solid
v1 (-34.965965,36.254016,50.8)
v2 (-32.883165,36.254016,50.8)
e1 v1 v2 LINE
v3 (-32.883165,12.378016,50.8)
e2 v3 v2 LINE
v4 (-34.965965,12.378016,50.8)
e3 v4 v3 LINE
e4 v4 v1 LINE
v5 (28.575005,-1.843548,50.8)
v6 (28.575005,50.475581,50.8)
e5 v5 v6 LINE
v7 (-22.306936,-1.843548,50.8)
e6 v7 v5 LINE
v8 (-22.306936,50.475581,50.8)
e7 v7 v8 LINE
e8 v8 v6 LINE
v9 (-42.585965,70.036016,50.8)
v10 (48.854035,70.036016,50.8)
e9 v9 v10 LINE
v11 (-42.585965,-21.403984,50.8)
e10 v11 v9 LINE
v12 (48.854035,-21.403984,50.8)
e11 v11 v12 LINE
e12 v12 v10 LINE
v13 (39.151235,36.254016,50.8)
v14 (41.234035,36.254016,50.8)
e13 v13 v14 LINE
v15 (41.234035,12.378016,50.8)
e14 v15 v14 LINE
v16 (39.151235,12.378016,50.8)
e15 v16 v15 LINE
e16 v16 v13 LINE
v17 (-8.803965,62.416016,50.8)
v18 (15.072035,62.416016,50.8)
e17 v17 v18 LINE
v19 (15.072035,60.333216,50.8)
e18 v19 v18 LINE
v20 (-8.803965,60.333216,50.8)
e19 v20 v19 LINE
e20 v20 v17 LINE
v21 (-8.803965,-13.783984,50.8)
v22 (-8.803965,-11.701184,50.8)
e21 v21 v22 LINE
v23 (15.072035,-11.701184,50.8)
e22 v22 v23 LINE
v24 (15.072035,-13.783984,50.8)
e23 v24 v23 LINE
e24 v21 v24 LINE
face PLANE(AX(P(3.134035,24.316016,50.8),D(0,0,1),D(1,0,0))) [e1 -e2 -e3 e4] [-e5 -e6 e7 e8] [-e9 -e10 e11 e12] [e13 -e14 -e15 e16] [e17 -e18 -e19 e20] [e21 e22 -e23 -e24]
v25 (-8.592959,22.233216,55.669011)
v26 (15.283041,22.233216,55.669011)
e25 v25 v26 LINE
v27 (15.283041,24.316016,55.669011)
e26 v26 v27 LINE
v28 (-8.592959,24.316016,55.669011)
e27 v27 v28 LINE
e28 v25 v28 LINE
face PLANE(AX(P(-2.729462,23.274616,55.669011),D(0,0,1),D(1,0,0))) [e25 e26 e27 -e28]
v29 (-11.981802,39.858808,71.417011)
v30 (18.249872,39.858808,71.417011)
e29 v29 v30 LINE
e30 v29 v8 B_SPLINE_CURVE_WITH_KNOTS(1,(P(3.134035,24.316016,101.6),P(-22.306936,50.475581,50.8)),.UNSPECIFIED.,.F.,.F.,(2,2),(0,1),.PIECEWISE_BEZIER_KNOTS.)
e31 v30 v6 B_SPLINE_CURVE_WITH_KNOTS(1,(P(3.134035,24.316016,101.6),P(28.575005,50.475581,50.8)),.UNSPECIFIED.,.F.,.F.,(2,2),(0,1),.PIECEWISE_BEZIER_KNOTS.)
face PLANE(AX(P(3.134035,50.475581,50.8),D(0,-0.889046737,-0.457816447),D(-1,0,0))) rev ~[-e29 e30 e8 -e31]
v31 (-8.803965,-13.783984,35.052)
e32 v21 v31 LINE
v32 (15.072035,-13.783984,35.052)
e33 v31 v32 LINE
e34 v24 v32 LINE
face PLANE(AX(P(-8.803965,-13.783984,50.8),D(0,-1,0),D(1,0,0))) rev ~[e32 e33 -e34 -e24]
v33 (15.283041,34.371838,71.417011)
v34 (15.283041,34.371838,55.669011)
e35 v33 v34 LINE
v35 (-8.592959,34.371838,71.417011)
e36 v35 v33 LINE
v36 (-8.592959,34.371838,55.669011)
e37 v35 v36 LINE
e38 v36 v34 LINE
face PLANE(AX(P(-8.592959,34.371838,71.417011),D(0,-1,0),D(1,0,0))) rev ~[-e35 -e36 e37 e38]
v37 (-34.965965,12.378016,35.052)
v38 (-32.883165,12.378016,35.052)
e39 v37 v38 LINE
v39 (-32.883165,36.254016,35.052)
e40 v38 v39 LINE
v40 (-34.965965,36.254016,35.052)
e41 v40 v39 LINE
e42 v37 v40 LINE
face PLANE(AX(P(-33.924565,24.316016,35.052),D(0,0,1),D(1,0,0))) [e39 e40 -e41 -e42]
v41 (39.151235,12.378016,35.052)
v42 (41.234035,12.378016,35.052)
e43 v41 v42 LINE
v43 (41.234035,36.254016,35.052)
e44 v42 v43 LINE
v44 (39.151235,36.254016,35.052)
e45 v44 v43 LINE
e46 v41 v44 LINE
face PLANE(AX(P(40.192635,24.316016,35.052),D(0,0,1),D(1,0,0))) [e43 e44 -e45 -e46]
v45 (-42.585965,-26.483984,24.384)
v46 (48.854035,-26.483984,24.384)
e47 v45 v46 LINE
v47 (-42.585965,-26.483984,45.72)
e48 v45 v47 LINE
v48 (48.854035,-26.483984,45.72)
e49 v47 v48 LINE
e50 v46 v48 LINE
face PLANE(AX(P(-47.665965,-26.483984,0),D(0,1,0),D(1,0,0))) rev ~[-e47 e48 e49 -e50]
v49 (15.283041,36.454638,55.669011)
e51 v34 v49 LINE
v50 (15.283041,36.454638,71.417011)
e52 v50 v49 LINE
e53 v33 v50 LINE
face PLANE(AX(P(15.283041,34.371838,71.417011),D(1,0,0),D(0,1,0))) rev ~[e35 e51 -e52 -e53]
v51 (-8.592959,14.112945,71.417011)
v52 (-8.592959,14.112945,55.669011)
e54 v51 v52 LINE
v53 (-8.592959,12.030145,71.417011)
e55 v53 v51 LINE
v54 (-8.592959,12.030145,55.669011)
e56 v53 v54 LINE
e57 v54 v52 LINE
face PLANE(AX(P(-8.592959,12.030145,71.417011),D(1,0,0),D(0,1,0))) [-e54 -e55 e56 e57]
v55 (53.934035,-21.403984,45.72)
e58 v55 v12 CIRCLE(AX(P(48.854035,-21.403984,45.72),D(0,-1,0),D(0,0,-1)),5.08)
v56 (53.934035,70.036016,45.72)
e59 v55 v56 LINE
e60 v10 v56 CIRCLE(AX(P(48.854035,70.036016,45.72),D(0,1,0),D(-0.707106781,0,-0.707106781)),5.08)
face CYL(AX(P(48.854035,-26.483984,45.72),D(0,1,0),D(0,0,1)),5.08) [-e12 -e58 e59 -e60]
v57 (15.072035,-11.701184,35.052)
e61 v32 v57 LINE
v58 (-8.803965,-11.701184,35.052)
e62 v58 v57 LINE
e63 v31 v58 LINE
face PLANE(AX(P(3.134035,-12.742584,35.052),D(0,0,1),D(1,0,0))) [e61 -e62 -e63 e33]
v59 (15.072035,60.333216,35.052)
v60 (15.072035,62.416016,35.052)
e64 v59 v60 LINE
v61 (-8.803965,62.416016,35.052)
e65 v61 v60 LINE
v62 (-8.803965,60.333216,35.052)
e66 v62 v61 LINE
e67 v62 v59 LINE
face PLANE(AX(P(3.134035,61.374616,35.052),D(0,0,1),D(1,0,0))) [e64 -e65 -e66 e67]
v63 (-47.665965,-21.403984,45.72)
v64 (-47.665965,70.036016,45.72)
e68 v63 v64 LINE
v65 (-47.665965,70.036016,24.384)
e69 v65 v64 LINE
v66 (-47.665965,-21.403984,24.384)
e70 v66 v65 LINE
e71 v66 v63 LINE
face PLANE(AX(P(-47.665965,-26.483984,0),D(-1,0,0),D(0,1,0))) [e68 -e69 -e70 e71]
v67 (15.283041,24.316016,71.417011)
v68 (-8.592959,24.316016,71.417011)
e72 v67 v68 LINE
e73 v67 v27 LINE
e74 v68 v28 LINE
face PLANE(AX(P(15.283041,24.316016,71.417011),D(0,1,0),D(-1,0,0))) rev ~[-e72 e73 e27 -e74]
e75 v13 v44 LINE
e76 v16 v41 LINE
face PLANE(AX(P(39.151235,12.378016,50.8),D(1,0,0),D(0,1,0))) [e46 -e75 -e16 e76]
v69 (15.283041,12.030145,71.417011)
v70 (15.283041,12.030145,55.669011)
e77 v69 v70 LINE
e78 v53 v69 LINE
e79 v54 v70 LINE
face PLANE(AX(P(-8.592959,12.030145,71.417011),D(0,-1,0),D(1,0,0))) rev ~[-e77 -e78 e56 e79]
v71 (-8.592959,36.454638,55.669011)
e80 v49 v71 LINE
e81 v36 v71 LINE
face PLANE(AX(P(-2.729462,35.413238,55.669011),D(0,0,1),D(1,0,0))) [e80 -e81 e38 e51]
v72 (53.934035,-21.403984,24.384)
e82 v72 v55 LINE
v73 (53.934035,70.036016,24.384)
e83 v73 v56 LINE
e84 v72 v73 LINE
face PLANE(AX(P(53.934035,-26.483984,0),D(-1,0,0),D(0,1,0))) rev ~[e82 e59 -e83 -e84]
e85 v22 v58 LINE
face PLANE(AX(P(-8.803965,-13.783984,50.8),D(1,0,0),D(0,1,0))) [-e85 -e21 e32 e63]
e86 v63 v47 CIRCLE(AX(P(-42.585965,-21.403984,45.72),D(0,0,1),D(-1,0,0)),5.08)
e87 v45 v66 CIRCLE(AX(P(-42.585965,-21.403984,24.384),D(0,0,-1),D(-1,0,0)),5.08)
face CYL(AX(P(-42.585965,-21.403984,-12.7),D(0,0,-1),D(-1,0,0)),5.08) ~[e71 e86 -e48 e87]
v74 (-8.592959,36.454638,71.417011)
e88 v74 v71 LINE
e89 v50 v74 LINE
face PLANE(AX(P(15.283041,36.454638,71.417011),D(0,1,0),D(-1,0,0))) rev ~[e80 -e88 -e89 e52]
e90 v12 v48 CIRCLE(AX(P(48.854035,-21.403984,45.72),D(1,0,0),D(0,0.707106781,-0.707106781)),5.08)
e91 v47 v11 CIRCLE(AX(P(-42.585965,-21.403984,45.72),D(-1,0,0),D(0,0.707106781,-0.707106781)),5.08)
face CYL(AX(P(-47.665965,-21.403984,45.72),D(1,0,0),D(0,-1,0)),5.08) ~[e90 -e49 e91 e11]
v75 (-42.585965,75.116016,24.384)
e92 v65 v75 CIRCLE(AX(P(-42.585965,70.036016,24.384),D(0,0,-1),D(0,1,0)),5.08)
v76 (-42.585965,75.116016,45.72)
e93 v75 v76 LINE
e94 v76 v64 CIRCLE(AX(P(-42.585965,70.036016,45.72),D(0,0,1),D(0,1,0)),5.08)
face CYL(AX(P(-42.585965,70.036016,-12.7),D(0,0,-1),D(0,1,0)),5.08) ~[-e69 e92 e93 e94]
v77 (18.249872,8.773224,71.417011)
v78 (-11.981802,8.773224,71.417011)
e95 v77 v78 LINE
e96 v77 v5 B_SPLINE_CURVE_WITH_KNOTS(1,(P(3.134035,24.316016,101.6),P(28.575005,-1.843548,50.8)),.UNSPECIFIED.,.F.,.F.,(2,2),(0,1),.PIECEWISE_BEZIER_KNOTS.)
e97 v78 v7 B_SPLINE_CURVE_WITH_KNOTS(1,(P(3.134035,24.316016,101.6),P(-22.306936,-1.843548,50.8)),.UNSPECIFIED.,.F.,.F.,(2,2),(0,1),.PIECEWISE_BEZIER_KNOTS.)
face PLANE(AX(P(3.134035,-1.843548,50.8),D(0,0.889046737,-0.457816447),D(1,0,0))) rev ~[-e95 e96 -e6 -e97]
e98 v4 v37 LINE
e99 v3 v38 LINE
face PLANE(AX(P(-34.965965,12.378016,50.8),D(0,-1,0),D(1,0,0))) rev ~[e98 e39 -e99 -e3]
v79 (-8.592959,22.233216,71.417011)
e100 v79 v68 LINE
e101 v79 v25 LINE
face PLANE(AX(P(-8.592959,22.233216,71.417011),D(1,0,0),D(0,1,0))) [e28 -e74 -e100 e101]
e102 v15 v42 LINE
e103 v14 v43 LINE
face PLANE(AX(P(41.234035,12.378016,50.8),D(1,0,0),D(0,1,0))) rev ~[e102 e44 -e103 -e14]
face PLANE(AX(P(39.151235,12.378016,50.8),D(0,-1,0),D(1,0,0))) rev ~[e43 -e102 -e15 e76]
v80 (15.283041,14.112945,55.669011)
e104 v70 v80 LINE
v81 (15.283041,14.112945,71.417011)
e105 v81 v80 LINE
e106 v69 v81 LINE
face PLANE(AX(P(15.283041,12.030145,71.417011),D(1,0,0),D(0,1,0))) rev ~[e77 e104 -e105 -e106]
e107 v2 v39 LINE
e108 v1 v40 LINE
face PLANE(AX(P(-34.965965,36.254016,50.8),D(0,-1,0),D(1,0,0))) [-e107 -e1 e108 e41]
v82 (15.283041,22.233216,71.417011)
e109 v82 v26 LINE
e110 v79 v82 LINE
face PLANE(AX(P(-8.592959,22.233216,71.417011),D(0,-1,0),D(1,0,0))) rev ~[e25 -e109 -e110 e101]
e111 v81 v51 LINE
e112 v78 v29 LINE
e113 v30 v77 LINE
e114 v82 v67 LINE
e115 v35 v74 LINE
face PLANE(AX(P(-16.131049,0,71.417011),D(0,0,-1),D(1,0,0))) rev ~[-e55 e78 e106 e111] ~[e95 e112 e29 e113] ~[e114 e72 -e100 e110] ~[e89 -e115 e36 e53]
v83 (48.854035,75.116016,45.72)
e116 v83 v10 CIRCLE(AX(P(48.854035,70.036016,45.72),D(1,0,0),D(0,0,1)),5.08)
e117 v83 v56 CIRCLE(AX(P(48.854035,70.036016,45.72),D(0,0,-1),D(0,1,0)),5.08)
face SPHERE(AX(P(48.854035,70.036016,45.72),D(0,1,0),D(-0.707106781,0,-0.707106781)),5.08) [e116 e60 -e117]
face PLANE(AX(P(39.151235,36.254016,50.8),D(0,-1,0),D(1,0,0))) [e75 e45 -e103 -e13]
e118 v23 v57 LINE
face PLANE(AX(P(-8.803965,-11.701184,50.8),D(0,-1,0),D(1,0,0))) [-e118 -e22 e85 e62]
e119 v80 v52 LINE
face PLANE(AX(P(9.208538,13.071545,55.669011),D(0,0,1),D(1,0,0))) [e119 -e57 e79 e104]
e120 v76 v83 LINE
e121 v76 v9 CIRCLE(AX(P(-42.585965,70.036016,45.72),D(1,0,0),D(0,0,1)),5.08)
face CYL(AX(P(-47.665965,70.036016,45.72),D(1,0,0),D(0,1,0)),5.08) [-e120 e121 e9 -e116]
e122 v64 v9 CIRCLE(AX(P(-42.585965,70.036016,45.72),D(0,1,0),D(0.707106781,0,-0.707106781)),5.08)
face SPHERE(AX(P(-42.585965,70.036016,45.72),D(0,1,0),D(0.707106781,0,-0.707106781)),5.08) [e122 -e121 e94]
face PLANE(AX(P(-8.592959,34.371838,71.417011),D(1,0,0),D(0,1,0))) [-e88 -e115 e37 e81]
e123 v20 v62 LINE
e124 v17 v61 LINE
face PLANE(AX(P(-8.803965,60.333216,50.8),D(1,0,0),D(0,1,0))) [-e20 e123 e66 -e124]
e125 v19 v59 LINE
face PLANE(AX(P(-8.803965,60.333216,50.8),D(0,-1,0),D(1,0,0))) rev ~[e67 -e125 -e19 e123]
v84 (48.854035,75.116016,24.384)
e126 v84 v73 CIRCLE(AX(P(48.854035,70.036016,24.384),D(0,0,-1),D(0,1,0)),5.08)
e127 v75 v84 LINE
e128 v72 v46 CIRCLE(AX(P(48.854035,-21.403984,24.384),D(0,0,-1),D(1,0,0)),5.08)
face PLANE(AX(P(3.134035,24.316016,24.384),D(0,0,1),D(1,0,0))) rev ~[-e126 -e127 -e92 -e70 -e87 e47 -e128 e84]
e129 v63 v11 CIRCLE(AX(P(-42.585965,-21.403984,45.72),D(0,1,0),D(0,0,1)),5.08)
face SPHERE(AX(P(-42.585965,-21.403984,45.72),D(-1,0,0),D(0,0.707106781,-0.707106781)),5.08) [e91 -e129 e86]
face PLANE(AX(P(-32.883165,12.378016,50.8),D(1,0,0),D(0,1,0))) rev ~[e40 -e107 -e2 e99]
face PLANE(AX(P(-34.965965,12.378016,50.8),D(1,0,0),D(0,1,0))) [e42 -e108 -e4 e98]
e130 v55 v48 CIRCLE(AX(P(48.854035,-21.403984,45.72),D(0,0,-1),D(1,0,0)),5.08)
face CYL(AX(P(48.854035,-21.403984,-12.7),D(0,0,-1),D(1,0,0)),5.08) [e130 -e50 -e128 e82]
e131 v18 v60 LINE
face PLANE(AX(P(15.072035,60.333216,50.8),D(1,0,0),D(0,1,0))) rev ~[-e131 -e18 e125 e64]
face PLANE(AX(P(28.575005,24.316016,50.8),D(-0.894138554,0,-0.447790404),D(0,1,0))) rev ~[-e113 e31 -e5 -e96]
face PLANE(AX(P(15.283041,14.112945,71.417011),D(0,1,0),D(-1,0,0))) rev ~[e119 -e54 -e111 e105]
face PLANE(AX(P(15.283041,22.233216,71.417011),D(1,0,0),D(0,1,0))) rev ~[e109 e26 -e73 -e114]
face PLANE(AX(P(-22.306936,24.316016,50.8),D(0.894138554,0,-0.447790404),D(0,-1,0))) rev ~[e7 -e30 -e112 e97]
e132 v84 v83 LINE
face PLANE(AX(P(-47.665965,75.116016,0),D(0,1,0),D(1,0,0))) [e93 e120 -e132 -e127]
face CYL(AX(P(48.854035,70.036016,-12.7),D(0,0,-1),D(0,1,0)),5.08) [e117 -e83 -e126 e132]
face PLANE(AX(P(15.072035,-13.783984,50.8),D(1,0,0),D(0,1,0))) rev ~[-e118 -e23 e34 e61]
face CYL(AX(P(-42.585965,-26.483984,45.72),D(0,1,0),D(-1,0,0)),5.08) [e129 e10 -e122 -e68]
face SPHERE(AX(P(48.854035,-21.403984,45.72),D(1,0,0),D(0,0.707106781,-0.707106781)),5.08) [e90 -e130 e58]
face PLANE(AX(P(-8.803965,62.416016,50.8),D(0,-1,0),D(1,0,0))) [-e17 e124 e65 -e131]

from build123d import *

# Parameters (mm, degrees)
F0_W         = 101.6
F0_H         = 101.6
F1_DEPTH     = 50.8
F2_W         = 50.8819408715
F2_H         = 52.3191291059
F6_R         = 5.08
F7_T1_DEPTH  = 58.42
F7_S5_W      = 5.08
F7_S5_H      = 5.08
F7_T6_DEPTH  = 5.08
F7_S11_W     = 5.08
F7_S11_H     = 5.08
F7_T12_DEPTH = 5.08
F7_S17_W     = 5.08
F7_S17_H     = 5.08
F7_T18_DEPTH = 5.08
F7_S23_W     = 5.08
F7_S23_H     = 5.08
F7_T24_DEPTH = 5.08
F8_W         = 36.9938705117
F8_H         = 32.6922610402
F9_DEPTH     = 43.434
F10_W        = 2.0828
F10_H        = 23.876
F10_W_2      = 23.876
F10_H_2      = 2.0828
F11_DEPTH    = 15.748
F12_W        = 11.7269940674
F12_H        = 2.0828
F12_W_2      = 12.1490059326
F13_DEPTH    = 15.748
F14_DEPTH    = 24.384


# Not quite as in the source:
# - a fillet or chamfer that OpenCascade refuses, or shapes differently, is made with other operations: its cross-section is extruded or revolved along the edge and cut away or added


with BuildPart() as f1:
    # F0 (on Top) → F1 (new body)
    with BuildSketch(Plane.XY):
        with Locations((3.134034574, 24.3160160567)):
            Rectangle(F0_W, F0_H)
    extrude(amount=F1_DEPTH)

    # F2 (on face) → F5 section 0
    with BuildSketch(Plane.XY.offset(50.8), mode=Mode.PRIVATE) as f5_s0:
        with Locations((3.134034574, 24.3160160567)):
            Rectangle(F2_W, F2_H)
    loft([Vertex(3.134034574, 24.3160160567, 101.6), f5_s0.sketch])

    # F6
    f6_edges = [f1.edges().sort_by_distance(p)[0] for p in [
        (3.134035, -26.483984, 50.8),
        (-47.665965, 24.316016, 50.8),
        (3.134035, 75.116016, 50.8),
        (53.934035, 24.316016, 50.8),
    ]]
    fillet(f6_edges, radius=F6_R)

    # F7: fillet of radius 5.08 on 4 edges, made by hand

    # F7_s2 → F7_t1 (cut)
    with BuildSketch(Plane.XY.offset(-12.7)):
        with BuildLine():
            ThreePointArc((-42.585965426, 75.1160160567), (-46.1780678744, 73.6281185051), (-47.665965426, 70.0360160567))
            Line((-47.665965426, 70.0360160567), (-47.665965426, 75.1160160567))
            Line((-47.665965426, 75.1160160567), (-42.585965426, 75.1160160567))
        make_face()
        with BuildLine():
            ThreePointArc((-47.665965426, -21.4039839433), (-46.1780678744, -24.9960863917), (-42.585965426, -26.4839839433))
            Line((-42.585965426, -26.4839839433), (-47.665965426, -26.4839839433))
            Line((-47.665965426, -26.4839839433), (-47.665965426, -21.4039839433))
        make_face()
        with BuildLine():
            ThreePointArc((53.934034574, -21.4039839433), (52.4461370225, -24.9960863917), (48.854034574, -26.4839839433))
            Line((48.854034574, -26.4839839433), (53.934034574, -26.4839839433))
            Line((53.934034574, -26.4839839433), (53.934034574, -21.4039839433))
        make_face()
        with BuildLine():
            ThreePointArc((48.854034574, 75.1160160567), (52.4461370225, 73.6281185051), (53.934034574, 70.0360160567))
            Line((53.934034574, 70.0360160567), (53.934034574, 75.1160160567))
            Line((53.934034574, 75.1160160567), (48.854034574, 75.1160160567))
        make_face()
    extrude(amount=F7_T1_DEPTH, mode=Mode.SUBTRACT)


with BuildPart() as f7_tool4:
    # F7_s5 → F7_t6 (new body)
    with BuildSketch(Plane.XZ.offset(-70.0360160567)):
        with Locations((51.394034574, 48.26)):
            Rectangle(F7_S5_W, F7_S5_H)
    extrude(amount=-F7_T6_DEPTH)

    # F7_s7 → F7_t8 (revolve, cut)
    with BuildSketch(Plane(origin=(48.854034574, 70.0360160567, 45.72), x_dir=(-0.7071067812, 0, -0.7071067812), z_dir=(0.7071067812, 0, -0.7071067812))):
        with BuildLine():
            ThreePointArc((0, -5.08), (5.08, 0), (0, 5.08))
            Line((0, 5.08), (0, -5.08))
        make_face()
    revolve(axis=Axis((48.854034574, 70.0360160567, 45.72), (0, 1, 0)), mode=Mode.SUBTRACT)


with BuildPart() as f1_1:
    add(f1.part)

    # F7_t3: cut F7_tool4
    add(f7_tool4.part, mode=Mode.SUBTRACT)


with BuildPart() as f7_tool10:
    # F7_s11 → F7_t12 (new body)
    with BuildSketch(Plane.YZ.offset(48.854034574)):
        with Locations((-23.9439839433, 48.26)):
            Rectangle(F7_S11_W, F7_S11_H)
    extrude(amount=F7_T12_DEPTH)

    # F7_s13 → F7_t14 (revolve, cut)
    with BuildSketch(Plane(origin=(48.854034574, -21.4039839433, 45.72), x_dir=(0, 0.7071067812, -0.7071067812), z_dir=(0, -0.7071067812, -0.7071067812))):
        with BuildLine():
            ThreePointArc((0, -5.08), (5.08, 0), (0, 5.08))
            Line((0, 5.08), (0, -5.08))
        make_face()
    revolve(axis=Axis((48.854034574, -21.4039839433, 45.72), (1, 0, 0)), mode=Mode.SUBTRACT)


with BuildPart() as f1_2:
    add(f1_1.part)

    # F7_t9: cut F7_tool10
    add(f7_tool10.part, mode=Mode.SUBTRACT)


with BuildPart() as f7_tool16:
    # F7_s17 → F7_t18 (new body)
    with BuildSketch(Plane.YZ.offset(-42.585965426)):
        with Locations((-23.9439839433, 48.26)):
            Rectangle(F7_S17_W, F7_S17_H)
    extrude(amount=-F7_T18_DEPTH)

    # F7_s19 → F7_t20 (revolve, cut)
    with BuildSketch(Plane(origin=(-42.585965426, -21.4039839433, 45.72), x_dir=(0, 0.7071067812, -0.7071067812), z_dir=(0, 0.7071067812, 0.7071067812))):
        with BuildLine():
            ThreePointArc((0, -5.08), (5.08, 0), (0, 5.08))
            Line((0, 5.08), (0, -5.08))
        make_face()
    revolve(axis=Axis((-42.585965426, -21.4039839433, 45.72), (-1, 0, 0)), mode=Mode.SUBTRACT)


with BuildPart() as f1_3:
    add(f1_2.part)

    # F7_t15: cut F7_tool16
    add(f7_tool16.part, mode=Mode.SUBTRACT)


with BuildPart() as f7_tool22:
    # F7_s23 → F7_t24 (new body)
    with BuildSketch(Plane.XZ.offset(-70.0360160567)):
        with Locations((-45.125965426, 48.26)):
            Rectangle(F7_S23_W, F7_S23_H)
    extrude(amount=-F7_T24_DEPTH)

    # F7_s25 → F7_t26 (revolve, cut)
    with BuildSketch(Plane(origin=(-42.585965426, 70.0360160567, 45.72), x_dir=(0.7071067812, 0, -0.7071067812), z_dir=(0.7071067812, 0, 0.7071067812))):
        with BuildLine():
            ThreePointArc((0, -5.08), (5.08, 0), (0, 5.08))
            Line((0, 5.08), (0, -5.08))
        make_face()
    revolve(axis=Axis((-42.585965426, 70.0360160567, 45.72), (0, 1, 0)), mode=Mode.SUBTRACT)


with BuildPart() as f1_4:
    add(f1_3.part)

    # F7_t21: cut F7_tool22
    add(f7_tool22.part, mode=Mode.SUBTRACT)

    # F8 (on Front) → F9 (cut)
    with BuildSketch(Plane.XZ):
        with Locations((2.3658862337, 87.7631418407)):
            Rectangle(F8_W, F8_H)
    extrude(amount=-F9_DEPTH, mode=Mode.SUBTRACT)

    # F10 (on face) → F11 (cut)
    with BuildSketch(Plane.XY.offset(50.8)):
        with Locations((-33.924565426, 24.3160160567)):
            Rectangle(F10_W, F10_H)
        with Locations((3.134034574, 61.3746160567)):
            Rectangle(F10_W_2, F10_H_2)
        with Locations((40.192634574, 24.3160160567)):
            Rectangle(F10_W, F10_H)
        with Locations((3.134034574, -12.7425839433)):
            Rectangle(F10_W_2, F10_H_2)
    extrude(amount=-F11_DEPTH, mode=Mode.SUBTRACT)

    # F12 (on face) → F13 (cut)
    with BuildSketch(Plane.XY.offset(71.4170113206)):
        with Locations((-2.7294624597, 35.4132379736)):
            Rectangle(F12_W, F12_H)
        with Locations((9.2085375403, 35.4132379736)):
            Rectangle(F12_W_2, F12_H)
        with Locations((9.2085375403, 13.0715451534)):
            Rectangle(F12_W_2, F12_H)
        with Locations((-2.7294624597, 13.0715451534)):
            Rectangle(F12_W, F12_H)
        with Locations((-2.7294624597, 23.2746160567)):
            Rectangle(F12_W, F12_H)
        with Locations((9.2085375403, 23.2746160567)):
            Rectangle(F12_W_2, F12_H)
    extrude(amount=-F13_DEPTH, mode=Mode.SUBTRACT)

    # F0 (on Top) → F14 (cut)
    with BuildSketch(Plane.XY):
        with Locations((3.134034574, 24.3160160567)):
            Rectangle(F0_W, F0_H)
    extrude(amount=F14_DEPTH, mode=Mode.SUBTRACT)


solid = f1_4.part
